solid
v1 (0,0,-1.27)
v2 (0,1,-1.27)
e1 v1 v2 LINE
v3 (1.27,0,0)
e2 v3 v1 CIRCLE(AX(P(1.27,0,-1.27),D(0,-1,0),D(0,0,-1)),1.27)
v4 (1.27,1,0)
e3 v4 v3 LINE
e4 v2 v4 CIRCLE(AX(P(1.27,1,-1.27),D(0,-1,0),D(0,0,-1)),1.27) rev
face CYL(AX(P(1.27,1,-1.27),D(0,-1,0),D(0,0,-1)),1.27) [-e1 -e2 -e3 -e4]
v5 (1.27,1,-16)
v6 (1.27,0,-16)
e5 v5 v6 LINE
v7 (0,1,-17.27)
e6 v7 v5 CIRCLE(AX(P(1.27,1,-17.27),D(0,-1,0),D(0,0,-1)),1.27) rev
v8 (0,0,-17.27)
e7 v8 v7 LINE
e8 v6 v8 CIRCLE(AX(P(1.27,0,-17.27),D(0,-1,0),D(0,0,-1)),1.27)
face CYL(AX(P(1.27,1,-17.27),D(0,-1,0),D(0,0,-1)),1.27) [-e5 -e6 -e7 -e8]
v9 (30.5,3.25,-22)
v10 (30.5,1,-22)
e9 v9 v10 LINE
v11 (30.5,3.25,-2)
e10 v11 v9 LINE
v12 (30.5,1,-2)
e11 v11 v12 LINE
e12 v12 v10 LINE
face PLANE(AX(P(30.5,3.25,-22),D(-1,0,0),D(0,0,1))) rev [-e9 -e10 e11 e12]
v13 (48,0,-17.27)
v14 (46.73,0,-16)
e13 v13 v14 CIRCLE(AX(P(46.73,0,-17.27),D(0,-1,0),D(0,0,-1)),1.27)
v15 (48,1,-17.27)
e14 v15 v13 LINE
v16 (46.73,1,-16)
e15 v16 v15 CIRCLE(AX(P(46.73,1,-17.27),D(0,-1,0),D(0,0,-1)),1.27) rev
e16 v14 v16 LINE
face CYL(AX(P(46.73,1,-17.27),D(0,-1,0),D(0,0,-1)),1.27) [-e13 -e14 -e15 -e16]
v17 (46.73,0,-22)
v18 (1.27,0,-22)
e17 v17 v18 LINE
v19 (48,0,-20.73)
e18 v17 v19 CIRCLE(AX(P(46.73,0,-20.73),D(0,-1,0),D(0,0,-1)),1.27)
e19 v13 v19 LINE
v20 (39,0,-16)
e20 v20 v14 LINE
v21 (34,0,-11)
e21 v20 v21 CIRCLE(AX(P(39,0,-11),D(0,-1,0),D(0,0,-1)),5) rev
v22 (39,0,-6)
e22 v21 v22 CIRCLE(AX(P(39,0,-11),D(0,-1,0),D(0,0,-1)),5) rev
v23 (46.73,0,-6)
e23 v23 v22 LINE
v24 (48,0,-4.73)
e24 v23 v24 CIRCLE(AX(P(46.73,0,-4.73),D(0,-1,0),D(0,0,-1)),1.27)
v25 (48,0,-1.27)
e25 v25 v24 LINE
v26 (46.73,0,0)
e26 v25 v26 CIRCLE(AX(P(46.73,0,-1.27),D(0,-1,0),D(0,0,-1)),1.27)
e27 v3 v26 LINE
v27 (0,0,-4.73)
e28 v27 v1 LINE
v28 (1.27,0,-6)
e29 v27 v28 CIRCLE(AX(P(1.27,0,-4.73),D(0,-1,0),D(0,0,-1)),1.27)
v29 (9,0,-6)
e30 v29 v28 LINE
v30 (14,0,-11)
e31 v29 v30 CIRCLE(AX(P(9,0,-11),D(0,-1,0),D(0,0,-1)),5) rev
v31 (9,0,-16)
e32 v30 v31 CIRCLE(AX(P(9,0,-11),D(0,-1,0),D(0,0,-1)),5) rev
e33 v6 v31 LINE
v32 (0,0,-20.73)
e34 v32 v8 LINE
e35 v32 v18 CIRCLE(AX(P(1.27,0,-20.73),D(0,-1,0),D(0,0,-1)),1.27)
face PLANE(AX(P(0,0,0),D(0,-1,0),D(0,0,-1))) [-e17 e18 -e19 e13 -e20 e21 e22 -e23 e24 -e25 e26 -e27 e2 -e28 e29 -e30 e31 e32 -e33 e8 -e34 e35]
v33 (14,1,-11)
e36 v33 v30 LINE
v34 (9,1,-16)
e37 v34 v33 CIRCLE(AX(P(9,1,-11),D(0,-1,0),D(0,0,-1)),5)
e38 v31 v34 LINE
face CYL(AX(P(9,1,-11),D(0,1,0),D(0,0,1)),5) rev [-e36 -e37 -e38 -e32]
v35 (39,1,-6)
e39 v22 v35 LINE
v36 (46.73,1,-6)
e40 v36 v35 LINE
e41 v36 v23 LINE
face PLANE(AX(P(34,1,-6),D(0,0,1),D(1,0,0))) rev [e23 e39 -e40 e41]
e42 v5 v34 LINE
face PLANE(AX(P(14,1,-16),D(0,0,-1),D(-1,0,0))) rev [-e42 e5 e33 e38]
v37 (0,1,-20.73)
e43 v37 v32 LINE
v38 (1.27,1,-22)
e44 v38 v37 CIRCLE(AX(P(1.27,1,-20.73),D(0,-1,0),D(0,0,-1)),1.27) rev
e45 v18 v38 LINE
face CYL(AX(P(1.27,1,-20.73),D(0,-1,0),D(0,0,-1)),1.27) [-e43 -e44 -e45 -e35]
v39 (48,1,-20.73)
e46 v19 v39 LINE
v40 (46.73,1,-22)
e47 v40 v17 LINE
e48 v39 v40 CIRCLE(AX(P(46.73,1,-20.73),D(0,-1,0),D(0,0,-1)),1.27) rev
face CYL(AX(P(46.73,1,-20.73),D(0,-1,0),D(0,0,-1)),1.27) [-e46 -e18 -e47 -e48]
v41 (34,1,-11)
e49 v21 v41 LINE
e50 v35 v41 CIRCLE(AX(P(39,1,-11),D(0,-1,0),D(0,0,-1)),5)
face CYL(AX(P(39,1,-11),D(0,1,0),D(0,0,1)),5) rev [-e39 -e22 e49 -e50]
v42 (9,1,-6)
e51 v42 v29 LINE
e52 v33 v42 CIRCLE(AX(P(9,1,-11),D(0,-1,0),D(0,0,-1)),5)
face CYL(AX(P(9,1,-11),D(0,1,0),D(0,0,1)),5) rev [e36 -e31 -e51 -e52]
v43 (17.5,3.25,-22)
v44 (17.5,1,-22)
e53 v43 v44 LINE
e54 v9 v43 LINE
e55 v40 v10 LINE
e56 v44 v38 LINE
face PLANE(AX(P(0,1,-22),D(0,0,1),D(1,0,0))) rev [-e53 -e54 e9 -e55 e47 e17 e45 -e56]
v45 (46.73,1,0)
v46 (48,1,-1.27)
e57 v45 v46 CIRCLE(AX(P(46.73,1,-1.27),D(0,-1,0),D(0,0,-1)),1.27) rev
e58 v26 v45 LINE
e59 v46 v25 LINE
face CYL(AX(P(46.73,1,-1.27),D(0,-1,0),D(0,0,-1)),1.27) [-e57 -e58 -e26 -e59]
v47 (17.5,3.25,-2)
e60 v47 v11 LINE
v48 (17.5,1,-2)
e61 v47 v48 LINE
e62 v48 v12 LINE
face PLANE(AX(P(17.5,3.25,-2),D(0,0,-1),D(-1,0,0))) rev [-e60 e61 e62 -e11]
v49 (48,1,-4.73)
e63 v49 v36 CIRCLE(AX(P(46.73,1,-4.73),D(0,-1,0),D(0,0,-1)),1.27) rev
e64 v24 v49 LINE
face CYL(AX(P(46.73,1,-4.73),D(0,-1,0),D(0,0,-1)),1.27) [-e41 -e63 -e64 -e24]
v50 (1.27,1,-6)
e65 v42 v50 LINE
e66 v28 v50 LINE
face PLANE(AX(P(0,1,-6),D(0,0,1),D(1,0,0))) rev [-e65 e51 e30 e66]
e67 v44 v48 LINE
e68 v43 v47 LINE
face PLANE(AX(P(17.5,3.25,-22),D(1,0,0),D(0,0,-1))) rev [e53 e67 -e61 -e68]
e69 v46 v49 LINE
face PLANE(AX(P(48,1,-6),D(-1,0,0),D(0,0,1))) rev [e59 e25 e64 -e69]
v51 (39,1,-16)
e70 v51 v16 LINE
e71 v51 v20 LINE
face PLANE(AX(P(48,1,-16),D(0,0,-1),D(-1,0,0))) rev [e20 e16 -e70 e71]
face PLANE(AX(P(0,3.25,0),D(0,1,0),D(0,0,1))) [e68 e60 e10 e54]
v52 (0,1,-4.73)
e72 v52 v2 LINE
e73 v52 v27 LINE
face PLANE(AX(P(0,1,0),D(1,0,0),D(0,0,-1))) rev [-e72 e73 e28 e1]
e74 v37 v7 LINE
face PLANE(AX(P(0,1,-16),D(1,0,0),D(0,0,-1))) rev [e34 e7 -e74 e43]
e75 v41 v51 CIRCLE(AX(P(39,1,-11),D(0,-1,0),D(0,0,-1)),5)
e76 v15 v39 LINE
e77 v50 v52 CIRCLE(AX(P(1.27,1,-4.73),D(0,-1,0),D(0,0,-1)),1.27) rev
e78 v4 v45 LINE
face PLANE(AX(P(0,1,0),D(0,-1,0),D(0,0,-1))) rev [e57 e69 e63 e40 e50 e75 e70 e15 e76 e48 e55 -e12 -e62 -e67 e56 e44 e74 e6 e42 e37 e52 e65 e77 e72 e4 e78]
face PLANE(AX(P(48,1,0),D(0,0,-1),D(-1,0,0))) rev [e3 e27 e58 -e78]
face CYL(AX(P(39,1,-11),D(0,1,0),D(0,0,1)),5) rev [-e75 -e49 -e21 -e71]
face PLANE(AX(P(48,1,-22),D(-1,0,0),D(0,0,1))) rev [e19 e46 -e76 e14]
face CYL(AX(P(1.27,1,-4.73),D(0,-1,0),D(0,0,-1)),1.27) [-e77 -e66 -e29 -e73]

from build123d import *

# Parameters (mm, degrees)
BOSS_EXTRUDE1_DEPTH = 1
FILLET1_R           = 1.27
FILLET2_R           = 5
SKETCH2_W           = 13
SKETCH2_H           = 20
BOSS_EXTRUDE2_DEPTH = 2.25


with BuildPart() as part:
    # Sketch1 → Boss-Extrude1 (new body)
    with BuildSketch(Plane(origin=(0, 0, 0), x_dir=(1, 0, 0), z_dir=(0, 1, 0))):
        Polygon((0, 0), (0, 6), (14, 6), (14, 16), (0, 16), (0, 22), (48, 22), (48, 16), (34, 16), (34, 6), (48, 6), (48, 0), align=None)
    extrude(amount=BOSS_EXTRUDE1_DEPTH)

    # Fillet1
    fillet1_edges = [part.edges().sort_by_distance(p)[0] for p in [
        (0, 0.5, 0),
        (0, 0.5, -6),
        (0, 0.5, -16),
        (0, 0.5, -22),
        (48, 0.5, -22),
        (48, 0.5, -16),
        (48, 0.5, -6),
        (48, 0.5, 0),
    ]]
    fillet(fillet1_edges, radius=FILLET1_R)

    # Fillet2
    fillet2_edges = [part.edges().sort_by_distance(p)[0] for p in [
        (34, 0.5, -6),
        (34, 0.5, -16),
        (14, 0.5, -6),
        (14, 0.5, -16),
    ]]
    fillet(fillet2_edges, radius=FILLET2_R - 0.0001)  # a hair under: the kernel refuses the full size

    # Sketch2 → Boss-Extrude2 (add)
    with BuildSketch(Plane(origin=(0, 1, 0), x_dir=(1, 0, 0), z_dir=(0, 1, 0))):
        with Locations((24, 12)):
            Rectangle(SKETCH2_W, SKETCH2_H)
    extrude(amount=BOSS_EXTRUDE2_DEPTH)


solid = part.part
